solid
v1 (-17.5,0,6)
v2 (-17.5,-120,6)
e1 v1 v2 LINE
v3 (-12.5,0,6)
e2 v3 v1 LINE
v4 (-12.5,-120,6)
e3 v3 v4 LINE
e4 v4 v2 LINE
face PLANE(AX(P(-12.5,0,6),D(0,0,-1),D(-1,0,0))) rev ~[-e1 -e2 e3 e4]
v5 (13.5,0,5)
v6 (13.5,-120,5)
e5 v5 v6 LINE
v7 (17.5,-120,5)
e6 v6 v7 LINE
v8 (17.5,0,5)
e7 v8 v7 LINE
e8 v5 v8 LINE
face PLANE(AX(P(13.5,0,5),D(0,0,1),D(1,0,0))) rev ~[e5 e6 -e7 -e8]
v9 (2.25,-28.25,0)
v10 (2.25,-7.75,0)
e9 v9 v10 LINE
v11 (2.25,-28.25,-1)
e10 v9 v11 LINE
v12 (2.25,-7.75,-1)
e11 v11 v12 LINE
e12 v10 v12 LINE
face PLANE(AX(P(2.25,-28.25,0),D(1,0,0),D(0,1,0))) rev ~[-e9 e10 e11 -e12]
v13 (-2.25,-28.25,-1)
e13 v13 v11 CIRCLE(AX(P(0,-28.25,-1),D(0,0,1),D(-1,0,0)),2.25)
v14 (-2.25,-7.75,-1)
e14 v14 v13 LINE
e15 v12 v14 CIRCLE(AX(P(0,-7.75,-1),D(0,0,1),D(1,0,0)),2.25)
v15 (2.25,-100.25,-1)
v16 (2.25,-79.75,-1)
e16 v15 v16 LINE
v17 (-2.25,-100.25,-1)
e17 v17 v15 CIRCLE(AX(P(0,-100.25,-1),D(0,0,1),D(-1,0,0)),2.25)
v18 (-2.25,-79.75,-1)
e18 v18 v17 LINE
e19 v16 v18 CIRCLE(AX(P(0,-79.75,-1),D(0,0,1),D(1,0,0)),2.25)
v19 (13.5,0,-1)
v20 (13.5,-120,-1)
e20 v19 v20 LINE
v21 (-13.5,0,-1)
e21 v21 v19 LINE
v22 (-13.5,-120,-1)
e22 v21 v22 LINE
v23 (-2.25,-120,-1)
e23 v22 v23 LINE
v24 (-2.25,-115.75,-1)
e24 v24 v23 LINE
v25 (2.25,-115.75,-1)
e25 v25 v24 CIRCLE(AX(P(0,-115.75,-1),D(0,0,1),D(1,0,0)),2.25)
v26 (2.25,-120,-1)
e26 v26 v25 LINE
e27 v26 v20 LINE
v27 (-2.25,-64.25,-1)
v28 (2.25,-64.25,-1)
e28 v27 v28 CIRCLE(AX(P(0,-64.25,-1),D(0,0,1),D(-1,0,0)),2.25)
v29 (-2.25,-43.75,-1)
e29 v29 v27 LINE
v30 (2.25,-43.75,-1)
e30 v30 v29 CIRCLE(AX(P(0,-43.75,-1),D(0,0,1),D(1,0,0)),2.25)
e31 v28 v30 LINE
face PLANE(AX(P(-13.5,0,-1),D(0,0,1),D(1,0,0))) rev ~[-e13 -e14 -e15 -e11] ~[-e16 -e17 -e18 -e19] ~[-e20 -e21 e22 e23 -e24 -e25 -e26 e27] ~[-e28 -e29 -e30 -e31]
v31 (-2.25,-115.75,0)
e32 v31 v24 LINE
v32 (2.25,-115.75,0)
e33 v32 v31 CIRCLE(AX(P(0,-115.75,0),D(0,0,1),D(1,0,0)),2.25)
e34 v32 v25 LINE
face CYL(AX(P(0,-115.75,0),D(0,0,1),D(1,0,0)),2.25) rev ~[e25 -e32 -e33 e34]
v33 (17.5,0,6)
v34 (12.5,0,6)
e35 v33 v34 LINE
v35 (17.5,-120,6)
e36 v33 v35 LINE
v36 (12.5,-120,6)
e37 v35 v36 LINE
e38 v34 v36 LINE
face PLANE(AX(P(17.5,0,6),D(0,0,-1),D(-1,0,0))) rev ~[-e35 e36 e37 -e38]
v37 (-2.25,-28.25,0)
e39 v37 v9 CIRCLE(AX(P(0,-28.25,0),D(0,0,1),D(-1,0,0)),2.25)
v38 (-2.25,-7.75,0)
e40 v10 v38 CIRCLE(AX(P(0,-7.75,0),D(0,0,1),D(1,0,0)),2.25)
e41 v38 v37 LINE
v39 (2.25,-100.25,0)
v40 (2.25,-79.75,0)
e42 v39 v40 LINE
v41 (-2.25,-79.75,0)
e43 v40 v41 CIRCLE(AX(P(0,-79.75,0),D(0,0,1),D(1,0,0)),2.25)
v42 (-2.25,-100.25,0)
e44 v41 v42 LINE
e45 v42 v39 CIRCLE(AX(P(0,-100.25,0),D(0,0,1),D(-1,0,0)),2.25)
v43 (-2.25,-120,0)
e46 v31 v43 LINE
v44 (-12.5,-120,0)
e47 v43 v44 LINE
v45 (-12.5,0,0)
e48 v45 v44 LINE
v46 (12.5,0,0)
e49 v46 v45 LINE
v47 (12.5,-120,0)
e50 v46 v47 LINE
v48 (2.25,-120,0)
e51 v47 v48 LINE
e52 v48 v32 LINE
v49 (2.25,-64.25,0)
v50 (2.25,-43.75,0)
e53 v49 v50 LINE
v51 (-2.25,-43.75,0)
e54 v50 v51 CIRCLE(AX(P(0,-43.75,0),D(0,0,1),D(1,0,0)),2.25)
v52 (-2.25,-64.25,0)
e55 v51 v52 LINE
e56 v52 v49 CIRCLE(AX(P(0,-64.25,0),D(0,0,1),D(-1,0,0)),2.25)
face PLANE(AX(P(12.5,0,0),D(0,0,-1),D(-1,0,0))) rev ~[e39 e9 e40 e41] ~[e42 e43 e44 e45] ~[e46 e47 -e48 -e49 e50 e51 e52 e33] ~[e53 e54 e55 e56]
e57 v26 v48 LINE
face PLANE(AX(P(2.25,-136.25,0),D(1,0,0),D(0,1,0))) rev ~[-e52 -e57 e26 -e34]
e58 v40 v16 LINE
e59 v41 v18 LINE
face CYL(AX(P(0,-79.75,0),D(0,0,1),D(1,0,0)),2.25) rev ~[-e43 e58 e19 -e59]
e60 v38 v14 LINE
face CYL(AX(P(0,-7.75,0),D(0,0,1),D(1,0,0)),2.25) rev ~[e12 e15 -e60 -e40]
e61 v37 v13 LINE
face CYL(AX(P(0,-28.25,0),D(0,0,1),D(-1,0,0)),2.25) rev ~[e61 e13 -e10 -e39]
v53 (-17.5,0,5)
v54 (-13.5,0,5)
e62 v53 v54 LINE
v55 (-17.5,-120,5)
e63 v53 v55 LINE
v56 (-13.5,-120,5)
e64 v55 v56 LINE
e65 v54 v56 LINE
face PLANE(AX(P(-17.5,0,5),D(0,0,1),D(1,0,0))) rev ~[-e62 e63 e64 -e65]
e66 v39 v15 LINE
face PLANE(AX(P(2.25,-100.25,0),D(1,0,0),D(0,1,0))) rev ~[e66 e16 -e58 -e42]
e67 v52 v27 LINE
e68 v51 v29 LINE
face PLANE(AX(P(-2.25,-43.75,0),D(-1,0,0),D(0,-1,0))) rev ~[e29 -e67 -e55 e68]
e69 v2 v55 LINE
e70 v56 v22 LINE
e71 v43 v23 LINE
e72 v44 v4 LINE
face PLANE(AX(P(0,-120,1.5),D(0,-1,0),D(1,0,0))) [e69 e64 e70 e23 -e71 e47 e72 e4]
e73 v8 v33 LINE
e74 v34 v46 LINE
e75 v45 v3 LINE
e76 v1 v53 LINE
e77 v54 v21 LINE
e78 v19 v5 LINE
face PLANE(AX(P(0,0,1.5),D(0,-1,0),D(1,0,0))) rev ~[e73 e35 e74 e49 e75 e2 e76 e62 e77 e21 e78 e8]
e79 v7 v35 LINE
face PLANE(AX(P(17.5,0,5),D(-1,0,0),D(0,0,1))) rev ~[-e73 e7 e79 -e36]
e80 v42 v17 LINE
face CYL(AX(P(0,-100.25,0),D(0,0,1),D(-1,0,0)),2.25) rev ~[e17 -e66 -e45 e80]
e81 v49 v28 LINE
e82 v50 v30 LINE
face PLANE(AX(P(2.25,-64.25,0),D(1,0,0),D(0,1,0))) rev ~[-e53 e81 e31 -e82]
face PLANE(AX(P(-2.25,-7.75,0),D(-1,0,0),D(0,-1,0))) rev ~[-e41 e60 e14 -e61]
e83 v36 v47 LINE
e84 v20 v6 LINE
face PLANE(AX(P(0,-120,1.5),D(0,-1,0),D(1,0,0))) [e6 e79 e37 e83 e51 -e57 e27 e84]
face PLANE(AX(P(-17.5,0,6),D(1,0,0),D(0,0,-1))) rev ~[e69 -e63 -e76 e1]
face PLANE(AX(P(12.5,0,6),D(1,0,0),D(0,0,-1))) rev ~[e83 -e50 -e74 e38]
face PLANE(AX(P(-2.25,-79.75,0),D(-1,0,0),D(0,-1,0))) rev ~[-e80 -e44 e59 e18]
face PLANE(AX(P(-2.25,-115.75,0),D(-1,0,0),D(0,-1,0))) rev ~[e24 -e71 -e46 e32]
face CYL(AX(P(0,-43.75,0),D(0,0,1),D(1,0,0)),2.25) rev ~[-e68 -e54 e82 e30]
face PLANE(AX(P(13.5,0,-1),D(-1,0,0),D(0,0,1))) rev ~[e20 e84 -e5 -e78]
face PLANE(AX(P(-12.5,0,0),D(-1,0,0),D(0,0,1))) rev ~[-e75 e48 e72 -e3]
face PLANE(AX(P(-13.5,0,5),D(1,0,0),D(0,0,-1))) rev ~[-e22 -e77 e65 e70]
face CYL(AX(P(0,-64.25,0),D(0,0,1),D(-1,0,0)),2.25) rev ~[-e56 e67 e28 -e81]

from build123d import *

# Parameters (mm, degrees)
F1_DEPTH = 120
F3_DEPTH = 1.001


# Not quite as in the source:
# - a feature names something its author has since deleted; it is built from what else it names


with BuildPart() as f1:
    # F0 (on Front) → F1 (new body)
    with BuildSketch(Plane.XZ):
        Polygon((-17.5, 6), (-17.5, 5), (-13.5, 5), (-13.5, -1), (13.5, -1), (13.5, 5), (17.5, 5), (17.5, 6), (12.5, 6), (12.5, 0), (-12.5, 0), (-12.5, 6), align=None)
    extrude(amount=F1_DEPTH)

    # F2 (on face) → F3 (cut, through all)
    with BuildSketch(Plane.XY):
        with BuildLine():
            ThreePointArc((-2.25, -28.25), (0, -30.5), (2.25, -28.25))
            Line((2.25, -28.25), (2.25, -7.75))
            ThreePointArc((2.25, -7.75), (0, -5.5), (-2.25, -7.75))
            Line((-2.25, -7.75), (-2.25, -28.25))
        make_face()
        with BuildLine():
            Line((-2.25, -43.75), (-2.25, -64.25))
            ThreePointArc((-2.25, -64.25), (0, -66.5), (2.25, -64.25))
            Line((2.25, -64.25), (2.25, -43.75))
            ThreePointArc((2.25, -43.75), (0, -41.5), (-2.25, -43.75))
        make_face()
        with BuildLine():
            Line((-2.25, -79.75), (-2.25, -100.25))
            ThreePointArc((-2.25, -100.25), (0, -102.5), (2.25, -100.25))
            Line((2.25, -100.25), (2.25, -79.75))
            ThreePointArc((2.25, -79.75), (0, -77.5), (-2.25, -79.75))
        make_face()
        with BuildLine():
            Line((-2.25, -120), (-2.25, -136.25))
            ThreePointArc((-2.25, -136.25), (0, -138.5), (2.25, -136.25))
            Line((2.25, -136.25), (2.25, -120))
            Line((2.25, -120), (-2.25, -120))
        make_face()
        with BuildLine():
            Line((-2.25, -115.75), (-2.25, -120))
            Line((-2.25, -120), (2.25, -120))
            Line((2.25, -120), (2.25, -115.75))
            ThreePointArc((2.25, -115.75), (0, -113.5), (-2.25, -115.75))
        make_face()
    extrude(amount=-F3_DEPTH, mode=Mode.SUBTRACT)


solid = f1.part
